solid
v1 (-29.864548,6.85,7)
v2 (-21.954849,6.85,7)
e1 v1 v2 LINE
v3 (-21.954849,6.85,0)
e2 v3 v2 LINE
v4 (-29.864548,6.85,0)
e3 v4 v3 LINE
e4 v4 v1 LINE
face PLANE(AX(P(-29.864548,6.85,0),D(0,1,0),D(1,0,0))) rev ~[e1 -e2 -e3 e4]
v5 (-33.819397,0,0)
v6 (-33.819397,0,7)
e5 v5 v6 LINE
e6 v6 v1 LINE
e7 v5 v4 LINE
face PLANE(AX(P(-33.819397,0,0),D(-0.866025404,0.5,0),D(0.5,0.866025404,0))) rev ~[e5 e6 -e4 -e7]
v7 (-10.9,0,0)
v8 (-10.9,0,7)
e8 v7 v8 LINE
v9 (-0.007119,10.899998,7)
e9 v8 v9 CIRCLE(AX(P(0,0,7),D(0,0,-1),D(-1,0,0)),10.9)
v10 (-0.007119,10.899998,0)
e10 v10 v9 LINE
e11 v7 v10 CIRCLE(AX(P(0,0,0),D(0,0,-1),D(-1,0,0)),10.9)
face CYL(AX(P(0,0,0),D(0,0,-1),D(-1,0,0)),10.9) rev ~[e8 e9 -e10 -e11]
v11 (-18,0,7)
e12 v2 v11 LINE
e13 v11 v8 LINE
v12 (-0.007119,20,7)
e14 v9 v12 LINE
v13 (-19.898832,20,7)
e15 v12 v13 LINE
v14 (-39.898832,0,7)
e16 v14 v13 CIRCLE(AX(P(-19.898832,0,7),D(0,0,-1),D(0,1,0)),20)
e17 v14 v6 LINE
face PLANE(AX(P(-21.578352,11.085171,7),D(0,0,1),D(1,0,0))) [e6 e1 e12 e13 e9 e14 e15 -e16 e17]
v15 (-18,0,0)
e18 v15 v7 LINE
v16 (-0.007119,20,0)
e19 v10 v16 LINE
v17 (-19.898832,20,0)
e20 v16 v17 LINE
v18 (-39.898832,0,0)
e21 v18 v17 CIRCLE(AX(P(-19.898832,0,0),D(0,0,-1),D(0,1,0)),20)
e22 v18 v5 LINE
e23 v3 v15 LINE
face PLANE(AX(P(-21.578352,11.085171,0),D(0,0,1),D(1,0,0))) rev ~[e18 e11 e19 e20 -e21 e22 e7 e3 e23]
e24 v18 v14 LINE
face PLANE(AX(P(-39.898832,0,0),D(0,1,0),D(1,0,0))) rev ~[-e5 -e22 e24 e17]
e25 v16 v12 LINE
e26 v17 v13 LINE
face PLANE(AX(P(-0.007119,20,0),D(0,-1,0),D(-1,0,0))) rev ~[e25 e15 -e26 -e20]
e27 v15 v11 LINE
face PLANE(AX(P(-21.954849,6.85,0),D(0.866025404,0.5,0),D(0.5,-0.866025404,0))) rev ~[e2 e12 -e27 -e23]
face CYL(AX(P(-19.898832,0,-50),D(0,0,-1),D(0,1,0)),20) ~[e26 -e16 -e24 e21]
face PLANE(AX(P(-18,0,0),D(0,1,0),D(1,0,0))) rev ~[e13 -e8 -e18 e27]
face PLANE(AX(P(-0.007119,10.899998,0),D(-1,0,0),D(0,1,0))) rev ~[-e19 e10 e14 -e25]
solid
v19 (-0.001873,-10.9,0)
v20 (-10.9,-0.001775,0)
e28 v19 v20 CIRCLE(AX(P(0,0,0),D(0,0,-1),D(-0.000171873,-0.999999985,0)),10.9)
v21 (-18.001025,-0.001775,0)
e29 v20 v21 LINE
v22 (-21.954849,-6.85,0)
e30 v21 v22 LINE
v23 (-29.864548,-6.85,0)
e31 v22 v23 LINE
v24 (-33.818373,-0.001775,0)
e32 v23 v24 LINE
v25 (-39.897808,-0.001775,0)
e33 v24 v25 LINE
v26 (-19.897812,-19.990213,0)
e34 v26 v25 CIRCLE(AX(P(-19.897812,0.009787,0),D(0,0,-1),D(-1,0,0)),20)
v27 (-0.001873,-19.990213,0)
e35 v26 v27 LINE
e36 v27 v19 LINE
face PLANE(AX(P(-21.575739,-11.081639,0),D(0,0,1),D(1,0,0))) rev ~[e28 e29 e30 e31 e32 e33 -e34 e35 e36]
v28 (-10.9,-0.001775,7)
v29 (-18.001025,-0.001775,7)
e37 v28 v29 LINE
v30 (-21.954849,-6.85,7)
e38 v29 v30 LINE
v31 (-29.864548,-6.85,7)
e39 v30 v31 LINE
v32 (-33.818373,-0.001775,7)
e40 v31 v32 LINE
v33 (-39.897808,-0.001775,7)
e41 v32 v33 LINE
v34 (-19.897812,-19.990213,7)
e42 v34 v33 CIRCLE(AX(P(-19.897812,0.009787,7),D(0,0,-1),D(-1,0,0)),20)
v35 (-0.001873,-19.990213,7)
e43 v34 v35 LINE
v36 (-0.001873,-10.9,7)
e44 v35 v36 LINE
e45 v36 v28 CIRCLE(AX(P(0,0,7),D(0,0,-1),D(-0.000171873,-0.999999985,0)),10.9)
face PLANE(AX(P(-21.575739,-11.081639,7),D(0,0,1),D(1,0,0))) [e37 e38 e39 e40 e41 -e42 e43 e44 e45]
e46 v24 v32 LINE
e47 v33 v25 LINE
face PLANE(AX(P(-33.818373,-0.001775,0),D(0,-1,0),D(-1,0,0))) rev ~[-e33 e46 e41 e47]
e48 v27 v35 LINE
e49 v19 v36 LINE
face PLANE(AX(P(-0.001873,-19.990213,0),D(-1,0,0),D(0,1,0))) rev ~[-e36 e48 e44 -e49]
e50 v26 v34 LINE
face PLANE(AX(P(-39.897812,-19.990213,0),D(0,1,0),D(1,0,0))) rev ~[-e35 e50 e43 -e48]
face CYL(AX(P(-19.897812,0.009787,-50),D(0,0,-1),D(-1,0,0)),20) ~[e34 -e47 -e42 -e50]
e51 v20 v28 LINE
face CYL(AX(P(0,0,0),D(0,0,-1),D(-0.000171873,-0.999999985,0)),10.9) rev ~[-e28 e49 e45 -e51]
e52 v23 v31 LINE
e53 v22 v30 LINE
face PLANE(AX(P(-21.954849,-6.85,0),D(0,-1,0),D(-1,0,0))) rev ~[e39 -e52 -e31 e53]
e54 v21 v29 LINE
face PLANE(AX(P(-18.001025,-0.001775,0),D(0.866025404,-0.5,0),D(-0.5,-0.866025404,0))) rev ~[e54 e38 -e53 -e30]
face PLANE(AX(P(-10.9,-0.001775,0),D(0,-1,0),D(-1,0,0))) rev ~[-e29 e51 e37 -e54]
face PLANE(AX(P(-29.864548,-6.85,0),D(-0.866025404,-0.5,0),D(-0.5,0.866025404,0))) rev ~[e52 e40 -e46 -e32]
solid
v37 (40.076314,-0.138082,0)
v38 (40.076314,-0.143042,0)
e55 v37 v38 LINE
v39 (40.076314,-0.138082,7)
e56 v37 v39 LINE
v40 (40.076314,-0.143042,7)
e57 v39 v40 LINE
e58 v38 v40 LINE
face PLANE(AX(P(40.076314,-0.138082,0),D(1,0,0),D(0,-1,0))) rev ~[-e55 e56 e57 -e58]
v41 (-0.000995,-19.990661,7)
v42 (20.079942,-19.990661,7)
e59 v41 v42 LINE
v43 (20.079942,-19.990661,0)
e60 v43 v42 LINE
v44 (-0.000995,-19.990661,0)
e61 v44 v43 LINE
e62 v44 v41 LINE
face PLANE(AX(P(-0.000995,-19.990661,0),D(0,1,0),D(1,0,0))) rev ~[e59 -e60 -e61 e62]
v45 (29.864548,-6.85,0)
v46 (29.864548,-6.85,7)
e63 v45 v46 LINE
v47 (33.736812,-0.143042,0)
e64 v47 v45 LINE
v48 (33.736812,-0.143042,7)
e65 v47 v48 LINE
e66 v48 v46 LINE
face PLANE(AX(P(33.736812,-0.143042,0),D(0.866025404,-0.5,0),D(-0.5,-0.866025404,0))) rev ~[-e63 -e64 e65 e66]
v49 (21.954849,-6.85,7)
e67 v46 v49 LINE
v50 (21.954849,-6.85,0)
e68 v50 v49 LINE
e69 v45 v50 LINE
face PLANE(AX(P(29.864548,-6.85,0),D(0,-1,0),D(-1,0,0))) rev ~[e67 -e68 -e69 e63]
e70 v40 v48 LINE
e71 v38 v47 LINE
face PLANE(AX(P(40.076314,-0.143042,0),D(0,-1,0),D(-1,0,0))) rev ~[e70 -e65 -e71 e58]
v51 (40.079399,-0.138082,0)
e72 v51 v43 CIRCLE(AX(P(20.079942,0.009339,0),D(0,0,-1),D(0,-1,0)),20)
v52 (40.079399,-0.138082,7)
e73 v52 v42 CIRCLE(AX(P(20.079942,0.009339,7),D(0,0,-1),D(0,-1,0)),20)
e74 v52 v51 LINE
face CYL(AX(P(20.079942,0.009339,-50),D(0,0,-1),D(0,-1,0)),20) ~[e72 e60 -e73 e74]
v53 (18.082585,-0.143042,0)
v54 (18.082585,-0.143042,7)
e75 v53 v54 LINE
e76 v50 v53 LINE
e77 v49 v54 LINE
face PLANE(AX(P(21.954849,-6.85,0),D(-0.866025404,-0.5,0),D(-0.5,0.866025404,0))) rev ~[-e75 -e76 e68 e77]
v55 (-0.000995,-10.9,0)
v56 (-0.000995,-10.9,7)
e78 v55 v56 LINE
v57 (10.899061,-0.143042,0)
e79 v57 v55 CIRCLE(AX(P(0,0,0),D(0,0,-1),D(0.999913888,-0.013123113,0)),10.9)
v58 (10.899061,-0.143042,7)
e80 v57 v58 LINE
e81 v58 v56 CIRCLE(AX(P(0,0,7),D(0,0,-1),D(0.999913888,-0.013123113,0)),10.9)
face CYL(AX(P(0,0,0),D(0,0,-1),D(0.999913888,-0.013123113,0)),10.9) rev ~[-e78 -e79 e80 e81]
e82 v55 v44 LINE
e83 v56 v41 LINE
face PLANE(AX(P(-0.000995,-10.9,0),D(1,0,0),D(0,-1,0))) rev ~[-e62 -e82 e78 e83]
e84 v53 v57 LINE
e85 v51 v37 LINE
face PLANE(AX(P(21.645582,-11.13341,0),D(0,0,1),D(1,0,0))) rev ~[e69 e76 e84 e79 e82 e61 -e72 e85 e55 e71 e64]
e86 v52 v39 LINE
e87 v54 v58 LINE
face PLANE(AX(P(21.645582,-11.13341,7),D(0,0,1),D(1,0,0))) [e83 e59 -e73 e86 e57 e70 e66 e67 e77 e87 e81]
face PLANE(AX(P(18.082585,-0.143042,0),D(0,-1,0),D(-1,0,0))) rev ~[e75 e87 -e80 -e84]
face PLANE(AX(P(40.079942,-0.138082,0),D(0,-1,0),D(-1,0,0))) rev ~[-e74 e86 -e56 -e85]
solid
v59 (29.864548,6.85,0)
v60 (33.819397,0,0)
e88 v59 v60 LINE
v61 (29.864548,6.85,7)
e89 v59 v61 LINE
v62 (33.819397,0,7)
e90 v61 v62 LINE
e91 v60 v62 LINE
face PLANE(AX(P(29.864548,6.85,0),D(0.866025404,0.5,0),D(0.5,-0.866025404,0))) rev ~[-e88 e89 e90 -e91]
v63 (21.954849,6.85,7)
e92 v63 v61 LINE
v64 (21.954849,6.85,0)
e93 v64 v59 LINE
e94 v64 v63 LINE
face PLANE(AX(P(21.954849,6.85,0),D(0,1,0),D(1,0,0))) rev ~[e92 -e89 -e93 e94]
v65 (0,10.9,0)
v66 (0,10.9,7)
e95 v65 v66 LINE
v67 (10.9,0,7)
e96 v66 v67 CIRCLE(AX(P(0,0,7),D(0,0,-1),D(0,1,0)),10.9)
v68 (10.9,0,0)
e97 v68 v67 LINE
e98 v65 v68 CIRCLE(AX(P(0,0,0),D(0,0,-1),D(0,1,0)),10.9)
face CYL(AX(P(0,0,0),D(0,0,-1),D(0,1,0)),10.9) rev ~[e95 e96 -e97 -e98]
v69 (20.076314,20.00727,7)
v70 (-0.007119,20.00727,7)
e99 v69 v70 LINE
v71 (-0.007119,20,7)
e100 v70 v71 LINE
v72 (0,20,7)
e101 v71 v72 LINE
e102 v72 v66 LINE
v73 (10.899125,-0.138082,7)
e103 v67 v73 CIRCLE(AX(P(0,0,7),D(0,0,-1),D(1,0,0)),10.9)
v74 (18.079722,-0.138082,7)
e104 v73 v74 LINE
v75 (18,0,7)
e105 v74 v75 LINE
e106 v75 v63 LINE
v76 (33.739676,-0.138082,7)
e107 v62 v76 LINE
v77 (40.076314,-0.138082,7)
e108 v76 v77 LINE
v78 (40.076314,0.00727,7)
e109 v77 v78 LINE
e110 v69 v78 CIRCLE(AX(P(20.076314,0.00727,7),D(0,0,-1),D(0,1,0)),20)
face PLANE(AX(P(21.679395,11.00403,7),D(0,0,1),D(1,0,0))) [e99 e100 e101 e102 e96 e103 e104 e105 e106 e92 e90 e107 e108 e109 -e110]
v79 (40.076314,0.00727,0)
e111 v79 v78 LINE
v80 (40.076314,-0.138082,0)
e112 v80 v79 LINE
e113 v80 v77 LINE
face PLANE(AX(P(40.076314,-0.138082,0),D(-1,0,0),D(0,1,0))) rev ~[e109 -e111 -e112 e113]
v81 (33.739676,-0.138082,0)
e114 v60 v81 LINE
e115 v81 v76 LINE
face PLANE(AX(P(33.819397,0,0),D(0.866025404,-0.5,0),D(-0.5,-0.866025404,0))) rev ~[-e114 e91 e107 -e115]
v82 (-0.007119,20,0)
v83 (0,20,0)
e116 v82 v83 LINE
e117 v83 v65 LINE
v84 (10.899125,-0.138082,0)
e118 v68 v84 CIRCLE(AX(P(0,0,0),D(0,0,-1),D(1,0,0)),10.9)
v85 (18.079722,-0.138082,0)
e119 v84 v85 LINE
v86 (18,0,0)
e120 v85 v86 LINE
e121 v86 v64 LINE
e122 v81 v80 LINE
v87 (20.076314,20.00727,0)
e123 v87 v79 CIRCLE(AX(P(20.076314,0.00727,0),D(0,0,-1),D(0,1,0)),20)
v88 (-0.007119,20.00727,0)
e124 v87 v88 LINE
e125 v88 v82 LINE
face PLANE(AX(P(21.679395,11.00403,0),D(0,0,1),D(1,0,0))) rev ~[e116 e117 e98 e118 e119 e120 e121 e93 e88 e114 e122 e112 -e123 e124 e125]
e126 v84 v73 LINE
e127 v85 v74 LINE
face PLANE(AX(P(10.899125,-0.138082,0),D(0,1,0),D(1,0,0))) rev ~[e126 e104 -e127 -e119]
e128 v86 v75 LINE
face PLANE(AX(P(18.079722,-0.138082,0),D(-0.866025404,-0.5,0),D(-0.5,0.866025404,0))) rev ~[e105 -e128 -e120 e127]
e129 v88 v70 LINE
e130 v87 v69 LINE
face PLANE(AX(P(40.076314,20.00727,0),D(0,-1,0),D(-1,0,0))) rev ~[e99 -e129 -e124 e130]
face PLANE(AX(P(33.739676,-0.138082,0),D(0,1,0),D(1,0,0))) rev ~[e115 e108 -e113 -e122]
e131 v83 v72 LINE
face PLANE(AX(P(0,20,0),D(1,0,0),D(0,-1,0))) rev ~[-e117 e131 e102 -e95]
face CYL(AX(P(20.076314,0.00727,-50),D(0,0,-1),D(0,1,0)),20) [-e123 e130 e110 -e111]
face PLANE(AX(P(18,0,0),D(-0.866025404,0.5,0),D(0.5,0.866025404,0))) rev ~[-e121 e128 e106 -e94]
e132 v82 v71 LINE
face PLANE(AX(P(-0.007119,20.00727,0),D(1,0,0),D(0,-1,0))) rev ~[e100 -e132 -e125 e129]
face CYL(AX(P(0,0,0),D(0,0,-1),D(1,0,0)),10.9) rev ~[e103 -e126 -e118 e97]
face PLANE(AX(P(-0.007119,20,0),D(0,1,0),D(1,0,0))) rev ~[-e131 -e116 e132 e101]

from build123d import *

# Parameters (mm, degrees)
F1_DEPTH      = 7
F2_T1_DEPTH   = 107
F2_2_T1_DEPTH = 107
F2_3_T1_DEPTH = 107
F2_4_T1_DEPTH = 107


# Not quite as in the source:
# - a fillet or chamfer that OpenCascade refuses, or shapes differently, is made with other operations: its cross-section is extruded or revolved along the edge and cut away or added


with BuildPart() as f1:
    # F0 (on Top) → F1 (new body)
    with BuildSketch(Plane.XY):
        with BuildLine():
            Line((-0.0071190066, 20.0072696805), (-0.0071190066, 20))
            Line((-0.0071190066, 20), (0, 20))
            Line((0, 20), (0, 10.9))
            ThreePointArc((0, 10.9), (7.7074639149, 7.7074639149), (10.9, 0))
            ThreePointArc((10.9, 0), (10.899781335, -0.0690423694), (10.8991253488, -0.1380819688))
            Line((10.8991253488, -0.1380819688), (18.0797216618, -0.1380819688))
            Line((18.0797216618, -0.1380819688), (18, 0))
            Line((18, 0), (21.9548493439, 6.85))
            Line((21.9548493439, 6.85), (29.8645480318, 6.85))
            Line((29.8645480318, 6.85), (33.8193973758, 0))
            Line((33.8193973758, 0), (33.739675714, -0.1380819688))
            Line((33.739675714, -0.1380819688), (40.0763135217, -0.1380819688))
            Line((40.0763135217, -0.1380819688), (40.0763135217, 20.0072696805))
            Line((40.0763135217, 20.0072696805), (-0.0071190066, 20.0072696805))
        make_face()
    extrude(amount=F1_DEPTH)

    # F2#4: fillet of radius 20 on 1 edges, made by hand

    # F2_4_s2 → F2_4_t1 (cut)
    with BuildSketch(Plane.XY.offset(-50)):
        with BuildLine():
            ThreePointArc((20.0763135217, 20.0072696805), (34.2184491454, 14.1494053042), (40.0763135217, 0.0072696805))
            Line((40.0763135217, 0.0072696805), (40.0763135217, 20.0072696805))
            Line((40.0763135217, 20.0072696805), (20.0763135217, 20.0072696805))
        make_face()
    extrude(amount=F2_4_T1_DEPTH, mode=Mode.SUBTRACT)


with BuildPart() as f1b:
    # F0 (on Top) → F1, piece 2 (new body)
    with BuildSketch(Plane.XY):
        with BuildLine():
            Line((-39.8988322914, 0), (-33.8193973758, 0))
            Line((-33.8193973758, 0), (-29.8645480318, 6.85))
            Line((-29.8645480318, 6.85), (-21.9548493439, 6.85))
            Line((-21.9548493439, 6.85), (-18, 0))
            Line((-18, 0), (-10.9, 0))
            ThreePointArc((-10.9, 0), (-7.709980453, 7.7049465549), (-0.0071190066, 10.8999976752))
            Line((-0.0071190066, 10.8999976752), (-0.0071190066, 20))
            Line((-0.0071190066, 20), (-39.8988322914, 20))
            Line((-39.8988322914, 20), (-39.8988322914, 0))
        make_face()
    extrude(amount=F1_DEPTH)

    # F2: fillet of radius 20 on 1 edges, made by hand

    # F2_s2 → F2_t1 (cut)
    with BuildSketch(Plane.XY.offset(-50)):
        with BuildLine():
            ThreePointArc((-19.8988322914, 20), (-34.0409679151, 14.1421356237), (-39.8988322914, 0))
            Line((-39.8988322914, 0), (-39.8988322914, 20))
            Line((-39.8988322914, 20), (-19.8988322914, 20))
        make_face()
    extrude(amount=F2_T1_DEPTH, mode=Mode.SUBTRACT)


with BuildPart() as f1c:
    # F0 (on Top) → F1, piece 3 (new body)
    with BuildSketch(Plane.XY):
        with BuildLine():
            Line((-29.8645480318, -6.85), (-33.8183725607, -0.0017750319))
            Line((-33.8183725607, -0.0017750319), (-39.897811533, -0.0017750319))
            Line((-39.897811533, -0.0017750319), (-39.897811533, -19.9902126039))
            Line((-39.897811533, -19.9902126039), (-0.0018734138, -19.9902126039))
            Line((-0.0018734138, -19.9902126039), (-0.0018734138, -10.899999839))
            ThreePointArc((-0.0018734138, -10.899999839), (-7.7074986981, -7.7074291316), (-10.8999998555, -0.0017750319))
            Line((-10.8999998555, -0.0017750319), (-18.0010248151, -0.0017750319))
            Line((-18.0010248151, -0.0017750319), (-21.9548493439, -6.85))
            Line((-21.9548493439, -6.85), (-29.8645480318, -6.85))
        make_face()
    extrude(amount=F1_DEPTH)

    # F2#2: fillet of radius 20 on 1 edges, made by hand

    # F2_2_s2 → F2_2_t1 (cut)
    with BuildSketch(Plane.XY.offset(-50)):
        with BuildLine():
            ThreePointArc((-39.897811533, 0.0097873961), (-34.0399471567, -14.1323482276), (-19.897811533, -19.9902126039))
            Line((-19.897811533, -19.9902126039), (-39.897811533, -19.9902126039))
            Line((-39.897811533, -19.9902126039), (-39.897811533, 0.0097873961))
        make_face()
    extrude(amount=F2_2_T1_DEPTH, mode=Mode.SUBTRACT)


with BuildPart() as f1d:
    # F0 (on Top) → F1, piece 4 (new body)
    with BuildSketch(Plane.XY):
        with BuildLine():
            ThreePointArc((10.8990613818, -0.1430419341), (7.6563698297, -7.7582215121), (-0.0009950386, -10.8999999546))
            Line((-0.0009950386, -10.8999999546), (-0.0009950386, -19.9906610558))
            Line((-0.0009950386, -19.9906610558), (40.0799419763, -19.9906610558))
            Line((40.0799419763, -19.9906610558), (40.0799419763, -0.1380819688))
            Line((40.0799419763, -0.1380819688), (40.0763135217, -0.1380819688))
            Line((40.0763135217, -0.1380819688), (40.0763135217, -0.1430419341))
            Line((40.0763135217, -0.1430419341), (33.7368120767, -0.1430419341))
            Line((33.7368120767, -0.1430419341), (29.8645480318, -6.85))
            Line((29.8645480318, -6.85), (21.9548493439, -6.85))
            Line((21.9548493439, -6.85), (18.0825852991, -0.1430419341))
            Line((18.0825852991, -0.1430419341), (10.8990613818, -0.1430419341))
        make_face()
    extrude(amount=F1_DEPTH)

    # F2#3: fillet of radius 20 on 1 edges, made by hand

    # F2_3_s2 → F2_3_t1 (cut)
    with BuildSketch(Plane.XY.offset(-50)):
        with BuildLine():
            ThreePointArc((20.0799419763, -19.9906610558), (34.2220776, -14.1327966795), (40.0799419763, 0.0093389442))
            Line((40.0799419763, 0.0093389442), (40.0799419763, -19.9906610558))
            Line((40.0799419763, -19.9906610558), (20.0799419763, -19.9906610558))
        make_face()
    extrude(amount=F2_3_T1_DEPTH, mode=Mode.SUBTRACT)


solid = Compound([f1.part, f1b.part, f1c.part, f1d.part])
